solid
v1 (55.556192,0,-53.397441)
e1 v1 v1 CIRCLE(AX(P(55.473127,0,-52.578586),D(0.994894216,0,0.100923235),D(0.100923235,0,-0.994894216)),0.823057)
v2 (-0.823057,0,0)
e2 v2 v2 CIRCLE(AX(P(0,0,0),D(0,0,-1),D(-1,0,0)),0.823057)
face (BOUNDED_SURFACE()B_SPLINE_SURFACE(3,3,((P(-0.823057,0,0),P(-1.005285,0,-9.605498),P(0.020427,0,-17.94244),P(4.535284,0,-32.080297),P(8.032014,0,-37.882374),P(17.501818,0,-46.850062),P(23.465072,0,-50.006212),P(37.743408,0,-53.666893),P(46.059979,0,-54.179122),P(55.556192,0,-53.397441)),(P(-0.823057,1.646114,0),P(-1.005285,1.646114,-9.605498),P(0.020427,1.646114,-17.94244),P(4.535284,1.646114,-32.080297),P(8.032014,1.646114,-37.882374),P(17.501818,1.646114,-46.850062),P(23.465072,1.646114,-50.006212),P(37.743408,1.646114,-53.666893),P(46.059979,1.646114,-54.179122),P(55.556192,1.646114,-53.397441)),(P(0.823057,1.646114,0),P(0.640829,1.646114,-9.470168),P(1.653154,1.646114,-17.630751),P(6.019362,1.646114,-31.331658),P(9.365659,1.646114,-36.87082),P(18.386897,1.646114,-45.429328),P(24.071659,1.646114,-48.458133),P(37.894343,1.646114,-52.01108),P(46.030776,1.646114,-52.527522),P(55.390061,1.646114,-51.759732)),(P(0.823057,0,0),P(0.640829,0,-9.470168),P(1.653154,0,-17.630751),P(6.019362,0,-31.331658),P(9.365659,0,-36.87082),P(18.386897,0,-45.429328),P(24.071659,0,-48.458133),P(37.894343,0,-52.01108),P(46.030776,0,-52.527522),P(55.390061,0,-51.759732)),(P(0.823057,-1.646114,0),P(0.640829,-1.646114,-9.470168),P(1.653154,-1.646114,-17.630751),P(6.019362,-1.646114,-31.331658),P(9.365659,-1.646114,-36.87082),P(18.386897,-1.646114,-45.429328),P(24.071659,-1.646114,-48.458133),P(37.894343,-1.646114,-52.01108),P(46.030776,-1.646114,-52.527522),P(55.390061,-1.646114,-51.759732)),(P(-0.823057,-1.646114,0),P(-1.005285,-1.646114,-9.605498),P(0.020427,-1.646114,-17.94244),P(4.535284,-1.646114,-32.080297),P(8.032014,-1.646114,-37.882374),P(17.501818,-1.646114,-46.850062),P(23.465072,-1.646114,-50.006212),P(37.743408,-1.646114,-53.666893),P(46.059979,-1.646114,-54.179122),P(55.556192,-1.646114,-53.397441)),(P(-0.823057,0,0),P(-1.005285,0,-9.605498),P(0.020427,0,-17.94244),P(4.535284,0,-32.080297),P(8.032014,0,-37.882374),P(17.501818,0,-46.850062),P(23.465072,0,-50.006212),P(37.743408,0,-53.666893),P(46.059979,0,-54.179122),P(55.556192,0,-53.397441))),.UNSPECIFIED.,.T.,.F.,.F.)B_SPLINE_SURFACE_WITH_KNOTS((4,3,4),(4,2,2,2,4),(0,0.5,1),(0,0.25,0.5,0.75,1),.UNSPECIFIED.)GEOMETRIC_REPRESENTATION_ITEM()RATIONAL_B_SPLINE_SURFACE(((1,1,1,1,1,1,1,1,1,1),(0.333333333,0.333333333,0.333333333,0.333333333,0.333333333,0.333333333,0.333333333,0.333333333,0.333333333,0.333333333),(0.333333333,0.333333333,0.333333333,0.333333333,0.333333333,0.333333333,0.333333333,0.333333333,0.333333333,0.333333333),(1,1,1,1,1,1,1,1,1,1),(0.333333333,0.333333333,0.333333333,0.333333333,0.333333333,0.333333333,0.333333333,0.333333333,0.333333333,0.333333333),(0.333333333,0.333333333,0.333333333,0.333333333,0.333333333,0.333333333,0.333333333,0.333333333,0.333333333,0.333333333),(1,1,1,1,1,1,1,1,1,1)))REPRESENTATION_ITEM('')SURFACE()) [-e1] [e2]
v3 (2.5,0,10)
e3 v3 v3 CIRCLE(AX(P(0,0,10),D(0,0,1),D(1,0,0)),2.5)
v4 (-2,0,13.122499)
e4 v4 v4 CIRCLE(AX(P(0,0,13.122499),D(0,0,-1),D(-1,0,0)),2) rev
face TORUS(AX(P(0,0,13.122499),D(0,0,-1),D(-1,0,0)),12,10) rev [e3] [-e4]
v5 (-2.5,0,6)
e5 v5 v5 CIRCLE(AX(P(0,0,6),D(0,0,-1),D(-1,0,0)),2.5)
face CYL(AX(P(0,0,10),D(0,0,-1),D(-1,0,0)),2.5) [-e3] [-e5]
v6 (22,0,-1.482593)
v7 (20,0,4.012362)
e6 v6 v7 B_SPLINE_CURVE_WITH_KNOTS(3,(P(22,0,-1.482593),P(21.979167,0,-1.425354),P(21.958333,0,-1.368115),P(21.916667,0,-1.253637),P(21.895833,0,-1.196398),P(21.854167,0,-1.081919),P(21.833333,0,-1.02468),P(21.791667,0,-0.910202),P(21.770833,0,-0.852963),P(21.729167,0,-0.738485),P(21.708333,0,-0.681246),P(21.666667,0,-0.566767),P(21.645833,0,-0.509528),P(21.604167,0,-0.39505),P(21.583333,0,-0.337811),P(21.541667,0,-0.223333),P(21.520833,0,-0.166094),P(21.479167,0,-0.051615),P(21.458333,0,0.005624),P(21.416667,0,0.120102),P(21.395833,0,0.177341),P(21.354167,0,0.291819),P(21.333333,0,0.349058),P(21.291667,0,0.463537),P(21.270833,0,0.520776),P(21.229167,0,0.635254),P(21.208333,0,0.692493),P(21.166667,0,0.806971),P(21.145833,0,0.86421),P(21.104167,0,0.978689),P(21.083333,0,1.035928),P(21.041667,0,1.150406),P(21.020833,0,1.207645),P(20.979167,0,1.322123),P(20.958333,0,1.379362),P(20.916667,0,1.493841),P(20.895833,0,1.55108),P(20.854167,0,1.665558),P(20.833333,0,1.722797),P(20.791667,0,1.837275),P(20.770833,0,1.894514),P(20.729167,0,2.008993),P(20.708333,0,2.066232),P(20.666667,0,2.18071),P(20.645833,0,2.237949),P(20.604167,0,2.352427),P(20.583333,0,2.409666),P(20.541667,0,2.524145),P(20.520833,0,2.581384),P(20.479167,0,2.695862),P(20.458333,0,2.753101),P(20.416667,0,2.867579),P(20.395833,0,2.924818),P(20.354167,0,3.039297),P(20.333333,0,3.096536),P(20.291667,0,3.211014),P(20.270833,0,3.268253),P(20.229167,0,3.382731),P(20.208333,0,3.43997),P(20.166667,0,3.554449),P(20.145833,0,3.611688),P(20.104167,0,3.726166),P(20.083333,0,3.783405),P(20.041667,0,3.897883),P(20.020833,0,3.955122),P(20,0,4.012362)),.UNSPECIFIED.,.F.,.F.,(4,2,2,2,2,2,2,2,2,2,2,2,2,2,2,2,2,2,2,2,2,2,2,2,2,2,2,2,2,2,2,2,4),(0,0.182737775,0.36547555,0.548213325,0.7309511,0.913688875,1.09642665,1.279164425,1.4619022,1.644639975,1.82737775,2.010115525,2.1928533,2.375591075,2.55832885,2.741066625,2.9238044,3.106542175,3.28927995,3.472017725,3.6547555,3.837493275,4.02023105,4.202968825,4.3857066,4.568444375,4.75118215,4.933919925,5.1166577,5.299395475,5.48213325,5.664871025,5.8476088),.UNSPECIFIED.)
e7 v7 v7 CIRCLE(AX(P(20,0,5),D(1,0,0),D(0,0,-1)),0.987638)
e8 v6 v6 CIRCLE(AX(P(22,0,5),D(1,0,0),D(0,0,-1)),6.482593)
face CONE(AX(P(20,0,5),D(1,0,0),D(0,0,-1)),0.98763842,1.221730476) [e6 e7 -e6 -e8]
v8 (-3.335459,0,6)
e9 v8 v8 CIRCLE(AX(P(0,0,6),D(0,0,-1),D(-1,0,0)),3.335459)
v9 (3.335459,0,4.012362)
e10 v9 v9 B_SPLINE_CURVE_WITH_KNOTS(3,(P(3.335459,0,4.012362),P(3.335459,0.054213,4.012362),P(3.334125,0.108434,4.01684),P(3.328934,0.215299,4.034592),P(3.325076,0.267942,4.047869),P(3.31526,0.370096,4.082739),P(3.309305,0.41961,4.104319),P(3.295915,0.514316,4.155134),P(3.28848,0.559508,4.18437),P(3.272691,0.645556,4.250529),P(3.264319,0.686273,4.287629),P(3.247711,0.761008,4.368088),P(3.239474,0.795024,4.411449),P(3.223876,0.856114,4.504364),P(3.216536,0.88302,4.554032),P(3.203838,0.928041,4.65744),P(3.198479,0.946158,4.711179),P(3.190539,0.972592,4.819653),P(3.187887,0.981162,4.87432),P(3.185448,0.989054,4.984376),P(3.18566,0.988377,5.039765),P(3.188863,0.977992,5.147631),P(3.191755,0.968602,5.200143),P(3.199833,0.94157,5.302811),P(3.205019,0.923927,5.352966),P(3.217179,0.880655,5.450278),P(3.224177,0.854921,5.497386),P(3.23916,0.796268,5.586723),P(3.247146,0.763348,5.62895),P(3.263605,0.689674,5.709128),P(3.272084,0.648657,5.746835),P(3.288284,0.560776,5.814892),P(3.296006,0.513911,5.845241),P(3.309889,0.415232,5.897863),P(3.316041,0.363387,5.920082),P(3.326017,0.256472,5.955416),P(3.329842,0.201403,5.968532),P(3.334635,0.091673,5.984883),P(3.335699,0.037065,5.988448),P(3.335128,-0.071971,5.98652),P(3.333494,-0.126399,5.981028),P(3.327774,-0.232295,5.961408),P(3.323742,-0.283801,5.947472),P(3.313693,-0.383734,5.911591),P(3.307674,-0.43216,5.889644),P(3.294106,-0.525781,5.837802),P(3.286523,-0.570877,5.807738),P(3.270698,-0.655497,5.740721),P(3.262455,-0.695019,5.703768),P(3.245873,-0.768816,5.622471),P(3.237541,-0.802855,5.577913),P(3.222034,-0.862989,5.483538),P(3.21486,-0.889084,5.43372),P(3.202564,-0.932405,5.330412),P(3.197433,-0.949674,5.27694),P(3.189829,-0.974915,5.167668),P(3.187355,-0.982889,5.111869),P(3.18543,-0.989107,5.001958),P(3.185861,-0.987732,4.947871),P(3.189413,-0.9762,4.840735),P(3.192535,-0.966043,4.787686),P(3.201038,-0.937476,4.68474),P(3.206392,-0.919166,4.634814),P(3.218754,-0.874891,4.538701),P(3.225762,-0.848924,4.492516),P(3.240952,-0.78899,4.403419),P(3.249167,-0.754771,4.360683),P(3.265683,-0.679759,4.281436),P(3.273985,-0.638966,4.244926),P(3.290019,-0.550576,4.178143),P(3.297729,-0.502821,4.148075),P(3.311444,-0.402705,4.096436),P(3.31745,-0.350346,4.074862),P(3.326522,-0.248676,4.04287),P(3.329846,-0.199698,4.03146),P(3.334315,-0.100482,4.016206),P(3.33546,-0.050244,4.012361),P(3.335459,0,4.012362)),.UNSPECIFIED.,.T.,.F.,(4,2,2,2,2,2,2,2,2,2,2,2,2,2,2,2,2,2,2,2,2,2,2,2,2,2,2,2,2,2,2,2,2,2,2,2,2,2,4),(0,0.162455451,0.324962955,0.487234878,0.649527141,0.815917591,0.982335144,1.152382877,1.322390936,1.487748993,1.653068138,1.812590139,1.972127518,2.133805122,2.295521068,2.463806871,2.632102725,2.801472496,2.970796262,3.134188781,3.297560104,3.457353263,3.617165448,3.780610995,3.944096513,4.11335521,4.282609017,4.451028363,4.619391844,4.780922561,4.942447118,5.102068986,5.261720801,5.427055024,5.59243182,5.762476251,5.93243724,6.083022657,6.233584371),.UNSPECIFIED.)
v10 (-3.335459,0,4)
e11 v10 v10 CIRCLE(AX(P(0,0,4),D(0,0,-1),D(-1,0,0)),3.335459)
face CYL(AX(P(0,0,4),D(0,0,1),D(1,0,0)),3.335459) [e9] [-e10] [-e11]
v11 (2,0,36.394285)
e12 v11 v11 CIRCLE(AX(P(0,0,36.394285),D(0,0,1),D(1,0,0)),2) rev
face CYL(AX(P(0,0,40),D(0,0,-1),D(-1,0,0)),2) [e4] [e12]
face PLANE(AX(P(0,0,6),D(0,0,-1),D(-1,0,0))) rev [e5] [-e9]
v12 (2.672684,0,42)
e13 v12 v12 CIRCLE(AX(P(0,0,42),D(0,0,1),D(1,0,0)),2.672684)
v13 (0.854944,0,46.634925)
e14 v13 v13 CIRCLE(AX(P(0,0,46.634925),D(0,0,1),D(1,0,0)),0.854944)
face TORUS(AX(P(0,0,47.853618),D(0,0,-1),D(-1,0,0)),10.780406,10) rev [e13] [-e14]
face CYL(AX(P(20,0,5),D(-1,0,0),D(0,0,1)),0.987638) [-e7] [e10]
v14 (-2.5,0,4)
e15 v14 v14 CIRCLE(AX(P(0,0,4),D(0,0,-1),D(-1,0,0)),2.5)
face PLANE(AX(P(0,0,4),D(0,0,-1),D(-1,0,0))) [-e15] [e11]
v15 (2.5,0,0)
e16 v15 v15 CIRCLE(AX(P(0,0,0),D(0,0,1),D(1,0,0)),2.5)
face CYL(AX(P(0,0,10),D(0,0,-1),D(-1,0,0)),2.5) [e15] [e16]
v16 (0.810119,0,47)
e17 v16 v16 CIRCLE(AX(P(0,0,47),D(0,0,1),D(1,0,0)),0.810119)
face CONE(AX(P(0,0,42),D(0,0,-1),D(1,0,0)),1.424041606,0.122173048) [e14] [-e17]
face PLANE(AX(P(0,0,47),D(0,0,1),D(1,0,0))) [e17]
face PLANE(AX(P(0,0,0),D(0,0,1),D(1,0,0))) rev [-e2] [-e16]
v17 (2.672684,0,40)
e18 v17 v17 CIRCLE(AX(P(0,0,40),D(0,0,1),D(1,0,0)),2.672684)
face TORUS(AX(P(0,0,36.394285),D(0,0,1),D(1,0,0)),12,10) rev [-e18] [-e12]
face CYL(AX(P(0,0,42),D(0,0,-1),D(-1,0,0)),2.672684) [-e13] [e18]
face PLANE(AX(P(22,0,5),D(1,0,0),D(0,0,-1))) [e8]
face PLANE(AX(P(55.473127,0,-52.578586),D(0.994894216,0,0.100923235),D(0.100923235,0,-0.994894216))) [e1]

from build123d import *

# Parameters (mm, degrees)
SKETCH1_R           = 2.5
BOSS_EXTRUDE1_DEPTH = 10
SKETCH2_R           = 2
BOSS_EXTRUDE2_DEPTH = 30
SKETCH3_R           = 2.672684215
BOSS_EXTRUDE3_DEPTH = 2
SKETCH4_R           = 1.424041606
BOSS_EXTRUDE4_DEPTH = 5
BOSS_EXTRUDE4_TAPER = 7
FILLET1_R           = 10
FILLET2_R           = 10
SKETCH5_R           = 3.335459114
BOSS_EXTRUDE5_DEPTH = 1
SKETCH6_R           = 0.98763842
BOSS_EXTRUDE6_DEPTH = 20
SKETCH7_R           = 0.98763842
BOSS_EXTRUDE7_DEPTH = 2
BOSS_EXTRUDE7_DRAFT = -70
SKETCH8_R           = 0.823056941


with BuildPart() as part:
    # Sketch1 → Boss-Extrude1 (new body)
    with BuildSketch(Plane.XY):
        Circle(SKETCH1_R)
    extrude(amount=BOSS_EXTRUDE1_DEPTH)

    # Sketch2 → Boss-Extrude2 (add)
    with BuildSketch(Plane.XY.offset(10)):
        Circle(SKETCH2_R)
    extrude(amount=BOSS_EXTRUDE2_DEPTH)

    # Sketch3 → Boss-Extrude3 (add)
    with BuildSketch(Plane.XY.offset(40)):
        Circle(SKETCH3_R)
    extrude(amount=BOSS_EXTRUDE3_DEPTH)

    # Sketch4 → Boss-Extrude4 (add)
    with BuildSketch(Plane.XY.offset(42)):
        Circle(SKETCH4_R)
    extrude(amount=BOSS_EXTRUDE4_DEPTH, taper=BOSS_EXTRUDE4_TAPER)

    # Fillet1
    # the kernel refuses this fillet: 10 mm, written as the material it adds along each edge
    with BuildSketch(Plane(origin=(0, 0, 10), x_dir=(1, 0, 0), z_dir=(0, -1, 0))) as fillet1_piece_1:
        with BuildLine():
            CenterArc((12, 3.122498999), FILLET1_R, 180, 18.194872339)
            Line((2.5, 0), (2.31, -0.06244998))
            ThreePointArc((2.31, -0.06244998), (2.25, -0.2), (2, -0.2))
            Line((2, -0.2), (1.8, 0))
            Line((1.8, 0), (1.8, 3.122498999))
            Line((1.8, 3.122498999), (2, 3.122498999))
        make_face()
    revolve(axis=Axis((0, 0, 10), (0, 0, 1)))

    # Fillet2
    # the kernel refuses this fillet: 10 mm, written as the material it adds along each edge
    with BuildSketch(Plane(origin=(0, 0, 42), x_dir=(1, 0, 0), z_dir=(0, 1, 0))) as fillet2_piece_1:
        with BuildLine():
            CenterArc((10.780405886, -5.85361848), FILLET2_R, 144.171442973, 28.828557027)
            Line((0.85494437, -4.634925046), (0.656435139, -4.610551177))
            Line((0.656435139, -4.610551177), (1.225532376, 0.024373869))
            Line((1.225532376, 0.024373869), (1.424041606, 0.2))
            ThreePointArc((1.424041606, 0.2), (2.048362911, 0.2), (2.510529782, 0.11707237))
            Line((2.510529782, 0.11707237), (2.672684215, 0))
        make_face()
    revolve(axis=Axis((0, 0, 42), (0, 0, -1)))
    with BuildSketch(Plane(origin=(0, 0, 40), x_dir=(1, 0, 0), z_dir=(0, -1, 0))) as fillet2_piece_2:
        with BuildLine():
            CenterArc((12, -3.605714943), FILLET2_R, 158.864702411, 21.135297589)
            Line((2.672684215, 0), (2.4861379, 0.072114299))
            ThreePointArc((2.4861379, 0.072114299), (2.336342108, 0.2), (2, 0.2))
            Line((2, 0.2), (1.8, 0))
            Line((1.8, 0), (1.8, -3.605714943))
            Line((1.8, -3.605714943), (2, -3.605714943))
        make_face()
    revolve(axis=Axis((0, 0, 40), (0, 0, 1)))

    # Sketch5 → Boss-Extrude5 (add, symmetric)
    with BuildSketch(Plane(origin=(0, 0, 5), x_dir=(-1, 0, 0), z_dir=(0, 0, -1))):
        Circle(SKETCH5_R)
    extrude(amount=BOSS_EXTRUDE5_DEPTH, both=True)

    # Sketch6 → Boss-Extrude6 (add)
    with BuildSketch(Plane(origin=(0, 0, 0), x_dir=(0, 0, -1), z_dir=(1, 0, 0))):
        with Locations((-5, 0)):
            Circle(SKETCH6_R)
    extrude(amount=BOSS_EXTRUDE6_DEPTH)


with BuildPart() as boss_extrude7_tool:
    # Sketch7 → Boss-Extrude7 (with draft: the straight prism first)
    with BuildSketch(Plane(origin=(20, 0, 0), x_dir=(0, 0, -1), z_dir=(1, 0, 0))):
        with Locations((-5, 0)):
            Circle(SKETCH7_R)
    extrude(amount=BOSS_EXTRUDE7_DEPTH)
    # Boss-Extrude7: the draft: its side faces are tilted about the plane it starts from
    boss_extrude7_sides = [boss_extrude7_tool.faces().sort_by_distance(p)[0] for p in [
        (21, 0, 5.98763842),
    ]]
    draft(boss_extrude7_sides, Plane(origin=(20, 0, 0), x_dir=(0, 0, -1), z_dir=(1, 0, 0)), BOSS_EXTRUDE7_DRAFT)


with BuildPart() as part_1:
    add(part.part)

    # Boss-Extrude7: add boss_extrude7_tool
    add(boss_extrude7_tool.part)

    # Sweep2: sweep along a path in Sketch9
    with BuildLine() as sweep2_path:  # in the path sketch's own coordinates; laid on its plane below (add() does not lay a ready-made edge on the line's plane)
        add(Edge.make_bspline(
            [(0, 0), (-1.093369244, 57.22699907), (55.473126635, 52.578586404)],
            knots=[0, 0, 0, 1, 1, 1], degree=2))
    # Sketch8 → Sweep2 (sweep)
    with BuildSketch(Plane(origin=(0, 0, 0), x_dir=(-1, 0, 0), z_dir=(0, 0, -1))):
        Circle(SKETCH8_R)
    sweep(path=Plane(origin=(0, 0, 0), x_dir=(1, 0, 0), z_dir=(0, 1, 0)) * sweep2_path.line)


solid = part_1.part
